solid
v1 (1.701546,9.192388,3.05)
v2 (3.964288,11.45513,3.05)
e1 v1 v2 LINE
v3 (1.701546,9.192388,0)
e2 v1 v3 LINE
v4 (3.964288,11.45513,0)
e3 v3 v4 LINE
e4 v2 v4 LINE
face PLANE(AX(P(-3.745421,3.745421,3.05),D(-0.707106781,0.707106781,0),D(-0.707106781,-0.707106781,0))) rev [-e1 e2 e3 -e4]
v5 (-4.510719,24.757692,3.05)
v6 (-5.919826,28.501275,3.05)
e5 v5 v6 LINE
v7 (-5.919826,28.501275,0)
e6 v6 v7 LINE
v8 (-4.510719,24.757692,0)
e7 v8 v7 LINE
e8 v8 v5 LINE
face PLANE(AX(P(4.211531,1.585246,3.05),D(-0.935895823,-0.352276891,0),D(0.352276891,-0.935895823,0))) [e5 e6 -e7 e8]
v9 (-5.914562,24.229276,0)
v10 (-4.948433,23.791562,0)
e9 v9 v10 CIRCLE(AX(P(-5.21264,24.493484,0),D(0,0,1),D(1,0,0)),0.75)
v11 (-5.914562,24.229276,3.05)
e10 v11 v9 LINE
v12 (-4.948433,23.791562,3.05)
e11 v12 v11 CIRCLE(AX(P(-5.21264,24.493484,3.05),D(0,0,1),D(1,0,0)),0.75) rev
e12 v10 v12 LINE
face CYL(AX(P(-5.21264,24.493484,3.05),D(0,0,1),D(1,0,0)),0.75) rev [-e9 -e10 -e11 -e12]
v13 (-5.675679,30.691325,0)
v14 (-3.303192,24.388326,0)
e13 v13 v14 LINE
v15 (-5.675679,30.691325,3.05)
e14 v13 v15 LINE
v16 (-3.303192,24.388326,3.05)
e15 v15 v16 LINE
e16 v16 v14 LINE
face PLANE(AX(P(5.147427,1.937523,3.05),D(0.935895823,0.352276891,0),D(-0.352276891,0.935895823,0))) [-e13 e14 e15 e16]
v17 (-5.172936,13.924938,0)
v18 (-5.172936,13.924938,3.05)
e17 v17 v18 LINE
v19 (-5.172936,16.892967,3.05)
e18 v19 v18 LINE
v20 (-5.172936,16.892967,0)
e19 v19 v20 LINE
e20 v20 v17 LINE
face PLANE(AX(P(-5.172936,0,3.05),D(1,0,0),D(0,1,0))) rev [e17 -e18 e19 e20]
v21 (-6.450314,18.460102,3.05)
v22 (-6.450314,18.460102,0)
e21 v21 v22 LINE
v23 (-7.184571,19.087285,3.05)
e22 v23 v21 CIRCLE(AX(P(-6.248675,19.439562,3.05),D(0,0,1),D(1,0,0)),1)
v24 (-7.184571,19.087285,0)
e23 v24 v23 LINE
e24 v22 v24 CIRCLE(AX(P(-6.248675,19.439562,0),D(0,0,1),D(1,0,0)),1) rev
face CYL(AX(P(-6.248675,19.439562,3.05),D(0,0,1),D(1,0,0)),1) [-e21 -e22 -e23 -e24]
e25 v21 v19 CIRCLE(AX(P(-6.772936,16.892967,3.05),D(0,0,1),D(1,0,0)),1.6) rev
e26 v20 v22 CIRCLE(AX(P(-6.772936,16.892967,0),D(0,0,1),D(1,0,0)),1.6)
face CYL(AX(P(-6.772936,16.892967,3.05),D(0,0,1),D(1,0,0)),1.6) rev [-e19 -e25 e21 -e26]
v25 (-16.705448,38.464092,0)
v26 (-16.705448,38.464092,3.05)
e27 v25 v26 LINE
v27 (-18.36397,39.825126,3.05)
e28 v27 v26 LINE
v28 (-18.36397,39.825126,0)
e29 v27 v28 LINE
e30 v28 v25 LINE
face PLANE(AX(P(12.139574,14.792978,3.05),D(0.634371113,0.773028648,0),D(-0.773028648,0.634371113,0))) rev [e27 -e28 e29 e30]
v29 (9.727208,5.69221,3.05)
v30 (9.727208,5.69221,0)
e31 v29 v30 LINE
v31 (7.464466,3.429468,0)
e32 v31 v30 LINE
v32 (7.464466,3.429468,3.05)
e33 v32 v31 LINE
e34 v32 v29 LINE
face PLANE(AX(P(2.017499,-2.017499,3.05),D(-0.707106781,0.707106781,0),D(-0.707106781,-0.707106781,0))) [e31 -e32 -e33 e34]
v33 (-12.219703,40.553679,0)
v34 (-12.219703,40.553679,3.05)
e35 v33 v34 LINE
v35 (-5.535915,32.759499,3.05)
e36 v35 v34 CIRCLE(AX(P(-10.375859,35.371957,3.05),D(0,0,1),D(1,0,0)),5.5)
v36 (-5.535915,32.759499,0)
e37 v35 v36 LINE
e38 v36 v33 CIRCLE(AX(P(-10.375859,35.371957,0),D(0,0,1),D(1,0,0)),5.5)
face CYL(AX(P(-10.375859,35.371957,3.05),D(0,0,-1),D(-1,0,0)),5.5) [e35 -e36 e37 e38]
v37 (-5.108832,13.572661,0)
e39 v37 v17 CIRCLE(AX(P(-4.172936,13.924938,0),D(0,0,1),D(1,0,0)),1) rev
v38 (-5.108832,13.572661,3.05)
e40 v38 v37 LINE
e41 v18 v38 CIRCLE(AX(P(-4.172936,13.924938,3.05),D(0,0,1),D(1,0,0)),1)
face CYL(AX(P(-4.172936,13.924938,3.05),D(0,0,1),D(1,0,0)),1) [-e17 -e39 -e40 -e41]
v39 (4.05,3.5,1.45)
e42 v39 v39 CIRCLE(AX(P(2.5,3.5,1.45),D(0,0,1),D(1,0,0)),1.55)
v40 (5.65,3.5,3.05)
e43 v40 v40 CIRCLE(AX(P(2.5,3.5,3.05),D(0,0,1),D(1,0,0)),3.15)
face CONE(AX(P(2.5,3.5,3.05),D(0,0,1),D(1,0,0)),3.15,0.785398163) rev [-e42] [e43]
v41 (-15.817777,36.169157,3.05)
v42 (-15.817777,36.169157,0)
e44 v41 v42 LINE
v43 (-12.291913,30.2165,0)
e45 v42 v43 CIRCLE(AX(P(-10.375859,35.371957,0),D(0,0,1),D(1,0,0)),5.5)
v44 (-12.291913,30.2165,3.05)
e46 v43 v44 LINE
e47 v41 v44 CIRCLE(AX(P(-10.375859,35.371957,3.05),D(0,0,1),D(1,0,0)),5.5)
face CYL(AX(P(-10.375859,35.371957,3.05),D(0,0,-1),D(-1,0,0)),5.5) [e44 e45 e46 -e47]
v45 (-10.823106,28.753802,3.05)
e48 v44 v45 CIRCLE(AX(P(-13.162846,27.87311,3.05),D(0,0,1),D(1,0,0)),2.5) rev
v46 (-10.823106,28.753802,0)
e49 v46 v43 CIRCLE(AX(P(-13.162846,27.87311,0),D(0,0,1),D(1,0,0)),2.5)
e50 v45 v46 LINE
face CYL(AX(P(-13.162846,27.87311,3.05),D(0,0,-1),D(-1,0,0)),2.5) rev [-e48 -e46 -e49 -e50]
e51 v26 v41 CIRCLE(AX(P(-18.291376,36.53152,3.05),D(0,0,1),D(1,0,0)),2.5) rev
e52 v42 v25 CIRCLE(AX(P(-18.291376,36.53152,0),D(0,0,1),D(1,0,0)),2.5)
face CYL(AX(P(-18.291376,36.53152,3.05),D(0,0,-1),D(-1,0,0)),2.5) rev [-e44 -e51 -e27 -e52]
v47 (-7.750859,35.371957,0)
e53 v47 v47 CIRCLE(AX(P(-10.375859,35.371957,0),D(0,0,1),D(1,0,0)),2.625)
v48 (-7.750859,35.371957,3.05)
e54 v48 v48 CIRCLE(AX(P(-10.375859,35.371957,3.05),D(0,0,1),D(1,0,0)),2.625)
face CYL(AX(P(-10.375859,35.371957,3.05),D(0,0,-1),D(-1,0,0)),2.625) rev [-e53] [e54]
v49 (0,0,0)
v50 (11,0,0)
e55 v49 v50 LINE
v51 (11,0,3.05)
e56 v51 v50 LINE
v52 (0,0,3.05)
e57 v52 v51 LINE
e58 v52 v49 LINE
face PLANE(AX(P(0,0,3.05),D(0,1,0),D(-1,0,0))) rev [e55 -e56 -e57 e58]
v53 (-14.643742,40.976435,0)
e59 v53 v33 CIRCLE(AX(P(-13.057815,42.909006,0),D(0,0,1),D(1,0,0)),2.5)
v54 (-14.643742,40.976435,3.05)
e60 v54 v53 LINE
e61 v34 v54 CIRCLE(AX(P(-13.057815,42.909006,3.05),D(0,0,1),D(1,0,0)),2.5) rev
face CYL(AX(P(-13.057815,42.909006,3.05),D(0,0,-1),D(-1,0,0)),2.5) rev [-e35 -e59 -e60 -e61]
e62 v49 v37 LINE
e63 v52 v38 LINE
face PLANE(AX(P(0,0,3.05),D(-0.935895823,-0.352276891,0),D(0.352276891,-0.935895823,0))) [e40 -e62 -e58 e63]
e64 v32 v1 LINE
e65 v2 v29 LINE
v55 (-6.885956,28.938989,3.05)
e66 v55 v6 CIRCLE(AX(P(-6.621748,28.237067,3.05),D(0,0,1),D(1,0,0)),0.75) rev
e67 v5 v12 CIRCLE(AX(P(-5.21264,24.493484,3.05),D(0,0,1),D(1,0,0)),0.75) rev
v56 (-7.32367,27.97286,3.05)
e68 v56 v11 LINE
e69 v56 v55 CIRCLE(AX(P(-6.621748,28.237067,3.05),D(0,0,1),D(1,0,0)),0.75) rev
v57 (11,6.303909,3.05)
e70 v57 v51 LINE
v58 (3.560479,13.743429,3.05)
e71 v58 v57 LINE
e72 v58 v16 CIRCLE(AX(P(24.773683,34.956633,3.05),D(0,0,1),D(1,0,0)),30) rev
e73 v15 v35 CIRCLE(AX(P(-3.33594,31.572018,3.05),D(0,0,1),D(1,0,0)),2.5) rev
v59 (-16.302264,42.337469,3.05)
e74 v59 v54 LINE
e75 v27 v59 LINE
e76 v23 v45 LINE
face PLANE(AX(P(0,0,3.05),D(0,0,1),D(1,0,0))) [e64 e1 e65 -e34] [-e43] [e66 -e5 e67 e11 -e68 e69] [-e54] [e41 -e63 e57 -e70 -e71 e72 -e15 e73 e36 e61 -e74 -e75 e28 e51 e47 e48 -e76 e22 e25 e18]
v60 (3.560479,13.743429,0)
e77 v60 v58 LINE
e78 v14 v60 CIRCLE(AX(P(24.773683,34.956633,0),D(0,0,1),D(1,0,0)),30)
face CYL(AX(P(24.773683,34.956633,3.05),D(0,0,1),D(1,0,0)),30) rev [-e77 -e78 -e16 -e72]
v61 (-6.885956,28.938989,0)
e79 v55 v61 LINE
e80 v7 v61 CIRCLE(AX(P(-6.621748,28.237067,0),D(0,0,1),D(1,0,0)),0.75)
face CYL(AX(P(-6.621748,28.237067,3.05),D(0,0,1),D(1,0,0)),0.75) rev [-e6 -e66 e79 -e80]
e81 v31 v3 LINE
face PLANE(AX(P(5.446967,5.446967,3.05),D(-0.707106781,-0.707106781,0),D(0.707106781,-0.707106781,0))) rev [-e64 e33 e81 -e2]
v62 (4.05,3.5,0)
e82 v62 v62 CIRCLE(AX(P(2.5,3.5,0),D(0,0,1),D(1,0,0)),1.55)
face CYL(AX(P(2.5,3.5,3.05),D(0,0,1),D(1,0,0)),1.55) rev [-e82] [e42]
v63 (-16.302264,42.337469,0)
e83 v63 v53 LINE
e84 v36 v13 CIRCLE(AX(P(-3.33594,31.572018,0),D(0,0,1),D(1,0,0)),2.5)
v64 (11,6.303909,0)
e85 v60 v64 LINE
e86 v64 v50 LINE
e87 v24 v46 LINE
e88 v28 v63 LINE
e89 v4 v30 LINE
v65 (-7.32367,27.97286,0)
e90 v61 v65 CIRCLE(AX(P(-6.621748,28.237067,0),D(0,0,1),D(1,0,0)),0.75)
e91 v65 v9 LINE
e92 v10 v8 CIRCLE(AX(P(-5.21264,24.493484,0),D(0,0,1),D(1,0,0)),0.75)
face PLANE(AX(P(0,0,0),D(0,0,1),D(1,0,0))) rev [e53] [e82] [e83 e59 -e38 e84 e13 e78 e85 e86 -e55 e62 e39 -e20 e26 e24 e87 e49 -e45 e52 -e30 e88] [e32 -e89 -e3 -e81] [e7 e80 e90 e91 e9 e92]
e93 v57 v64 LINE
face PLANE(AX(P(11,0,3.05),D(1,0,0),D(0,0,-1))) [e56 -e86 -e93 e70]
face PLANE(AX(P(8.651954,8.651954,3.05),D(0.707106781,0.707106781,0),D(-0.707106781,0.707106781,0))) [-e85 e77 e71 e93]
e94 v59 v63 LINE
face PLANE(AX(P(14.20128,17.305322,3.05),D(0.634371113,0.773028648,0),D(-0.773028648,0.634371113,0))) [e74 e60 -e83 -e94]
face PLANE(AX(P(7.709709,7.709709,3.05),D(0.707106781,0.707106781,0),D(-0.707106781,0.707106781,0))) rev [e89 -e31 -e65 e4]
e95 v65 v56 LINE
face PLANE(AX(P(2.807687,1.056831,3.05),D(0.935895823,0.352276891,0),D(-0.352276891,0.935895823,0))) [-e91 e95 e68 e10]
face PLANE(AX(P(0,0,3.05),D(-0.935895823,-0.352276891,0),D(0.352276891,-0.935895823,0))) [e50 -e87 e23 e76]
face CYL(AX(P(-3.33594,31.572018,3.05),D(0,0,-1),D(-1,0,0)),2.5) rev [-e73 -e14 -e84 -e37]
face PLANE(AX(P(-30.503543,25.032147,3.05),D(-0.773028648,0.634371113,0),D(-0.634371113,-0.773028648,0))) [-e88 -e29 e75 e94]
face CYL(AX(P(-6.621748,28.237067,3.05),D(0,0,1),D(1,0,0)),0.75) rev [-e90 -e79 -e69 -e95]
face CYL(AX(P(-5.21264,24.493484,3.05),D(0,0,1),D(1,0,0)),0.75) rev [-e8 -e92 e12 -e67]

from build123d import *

# Parameters (mm, degrees)
SKETCH1_R           = 1.5
SKETCH1_R_2         = 2.625
BOSS_EXTRUDE1_DEPTH = 3.05
FILLET2_R           = 1.6
FILLET3_R           = 2.5
FILLET4_R           = 30
FILLET5_R           = 1
FILLET6_R           = 0.75


with BuildPart() as part:
    # Sketch1 → Boss-Extrude1 (new body)
    with BuildSketch(Plane.XY):
        with BuildLine():
            Line((-5.172936369, 13.742966599), (0, 0))
            Line((0, 0), (11, 0))
            Line((11, 0), (11, 6.303908615))
            Line((11, 6.303908615), (-1.02081528, 18.324723896))
            Line((-1.02081528, 18.324723896), (-6.124201376, 31.882915925))
            ThreePointArc((-6.124201376, 31.882915925), (-6.290762776, 39.054617678), (-13.40685584, 39.961407754))
            Line((-13.40685584, 39.961407754), (-16.302263716, 42.337468617))
            Line((-16.302263716, 42.337468617), (-18.363969834, 39.82512551))
            Line((-18.363969834, 39.82512551), (-15.468561957, 37.449064647))
            ThreePointArc((-15.468561957, 37.449064647), (-15.176038376, 32.687133516), (-11.271628404, 29.945393026))
            Line((-11.271628404, 29.945393026), (-6.960865313, 18.492966599))
            Line((-6.960865313, 18.492966599), (-5.172936369, 18.492966599))
            Line((-5.172936369, 18.492966599), (-5.172936369, 13.742966599))
        make_face()
        with Locations((2.5, 3.5)):
            Circle(SKETCH1_R, mode=Mode.SUBTRACT)
        Polygon((9.727207794, 5.692209589), (7.517499103, 3.482500897), (7.464466094, 3.429467889), (1.701545827, 9.192388155), (3.964287527, 11.455129855), align=None, mode=Mode.SUBTRACT)
        Polygon((-5.650354628, 23.527354521), (-7.587877527, 28.67478155), (-6.184033792, 29.203196886), (-4.246510893, 24.055769857), align=None, mode=Mode.SUBTRACT)
        with Locations((-10.375858941, 35.371957047)):
            Circle(SKETCH1_R_2, mode=Mode.SUBTRACT)
    extrude(amount=BOSS_EXTRUDE1_DEPTH)

    # Sketch3 → CSK for M3 Flat Head Machine Screw1 (revolve, cut)
    with BuildSketch(Plane(origin=(2.5, 3.5, 3.05), x_dir=(0, -1, 0), z_dir=(1, 0, 0))):
        Polygon((0, 0), (0, 3.05), (1.55, 3.05), (1.55, 1.6), (3.15, 0), align=None)
    revolve(axis=Axis((2.5, 3.5, 9.4), (0, 0, -1)), mode=Mode.SUBTRACT)

    # Fillet2
    fillet2_edges = [part.edges().sort_by_distance(p)[0] for p in [
        (-5.172936369, 18.492966599, 1.525),
    ]]
    fillet(fillet2_edges, radius=FILLET2_R)

    # Fillet3
    fillet3_edges = [part.edges().sort_by_distance(p)[0] for p in [
        (-6.124201376, 31.882915925, 1.525),
        (-11.271628404, 29.945393026, 1.525),
        (-15.468561957, 37.449064647, 1.525),
        (-13.40685584, 39.961407754, 1.525),
    ]]
    fillet(fillet3_edges, radius=FILLET3_R)

    # Fillet4
    fillet4_edges = [part.edges().sort_by_distance(p)[0] for p in [
        (-1.02081528, 18.324723896, 1.525),
    ]]
    fillet(fillet4_edges, radius=FILLET4_R)

    # Fillet5
    fillet5_edges = [part.edges().sort_by_distance(p)[0] for p in [
        (-6.960865313, 18.492966599, 1.525),
        (-5.172936369, 13.742966599, 1.525),
    ]]
    fillet(fillet5_edges, radius=FILLET5_R)

    # Fillet6
    fillet6_edges = [part.edges().sort_by_distance(p)[0] for p in [
        (-4.246510893, 24.055769857, 1.525),
        (-5.650354628, 23.527354521, 1.525),
        (-6.184033792, 29.203196886, 1.525),
        (-7.587877527, 28.67478155, 1.525),
    ]]
    fillet(fillet6_edges, radius=FILLET6_R - 0.0001)  # a hair under: the kernel refuses the full size


solid = part.part
